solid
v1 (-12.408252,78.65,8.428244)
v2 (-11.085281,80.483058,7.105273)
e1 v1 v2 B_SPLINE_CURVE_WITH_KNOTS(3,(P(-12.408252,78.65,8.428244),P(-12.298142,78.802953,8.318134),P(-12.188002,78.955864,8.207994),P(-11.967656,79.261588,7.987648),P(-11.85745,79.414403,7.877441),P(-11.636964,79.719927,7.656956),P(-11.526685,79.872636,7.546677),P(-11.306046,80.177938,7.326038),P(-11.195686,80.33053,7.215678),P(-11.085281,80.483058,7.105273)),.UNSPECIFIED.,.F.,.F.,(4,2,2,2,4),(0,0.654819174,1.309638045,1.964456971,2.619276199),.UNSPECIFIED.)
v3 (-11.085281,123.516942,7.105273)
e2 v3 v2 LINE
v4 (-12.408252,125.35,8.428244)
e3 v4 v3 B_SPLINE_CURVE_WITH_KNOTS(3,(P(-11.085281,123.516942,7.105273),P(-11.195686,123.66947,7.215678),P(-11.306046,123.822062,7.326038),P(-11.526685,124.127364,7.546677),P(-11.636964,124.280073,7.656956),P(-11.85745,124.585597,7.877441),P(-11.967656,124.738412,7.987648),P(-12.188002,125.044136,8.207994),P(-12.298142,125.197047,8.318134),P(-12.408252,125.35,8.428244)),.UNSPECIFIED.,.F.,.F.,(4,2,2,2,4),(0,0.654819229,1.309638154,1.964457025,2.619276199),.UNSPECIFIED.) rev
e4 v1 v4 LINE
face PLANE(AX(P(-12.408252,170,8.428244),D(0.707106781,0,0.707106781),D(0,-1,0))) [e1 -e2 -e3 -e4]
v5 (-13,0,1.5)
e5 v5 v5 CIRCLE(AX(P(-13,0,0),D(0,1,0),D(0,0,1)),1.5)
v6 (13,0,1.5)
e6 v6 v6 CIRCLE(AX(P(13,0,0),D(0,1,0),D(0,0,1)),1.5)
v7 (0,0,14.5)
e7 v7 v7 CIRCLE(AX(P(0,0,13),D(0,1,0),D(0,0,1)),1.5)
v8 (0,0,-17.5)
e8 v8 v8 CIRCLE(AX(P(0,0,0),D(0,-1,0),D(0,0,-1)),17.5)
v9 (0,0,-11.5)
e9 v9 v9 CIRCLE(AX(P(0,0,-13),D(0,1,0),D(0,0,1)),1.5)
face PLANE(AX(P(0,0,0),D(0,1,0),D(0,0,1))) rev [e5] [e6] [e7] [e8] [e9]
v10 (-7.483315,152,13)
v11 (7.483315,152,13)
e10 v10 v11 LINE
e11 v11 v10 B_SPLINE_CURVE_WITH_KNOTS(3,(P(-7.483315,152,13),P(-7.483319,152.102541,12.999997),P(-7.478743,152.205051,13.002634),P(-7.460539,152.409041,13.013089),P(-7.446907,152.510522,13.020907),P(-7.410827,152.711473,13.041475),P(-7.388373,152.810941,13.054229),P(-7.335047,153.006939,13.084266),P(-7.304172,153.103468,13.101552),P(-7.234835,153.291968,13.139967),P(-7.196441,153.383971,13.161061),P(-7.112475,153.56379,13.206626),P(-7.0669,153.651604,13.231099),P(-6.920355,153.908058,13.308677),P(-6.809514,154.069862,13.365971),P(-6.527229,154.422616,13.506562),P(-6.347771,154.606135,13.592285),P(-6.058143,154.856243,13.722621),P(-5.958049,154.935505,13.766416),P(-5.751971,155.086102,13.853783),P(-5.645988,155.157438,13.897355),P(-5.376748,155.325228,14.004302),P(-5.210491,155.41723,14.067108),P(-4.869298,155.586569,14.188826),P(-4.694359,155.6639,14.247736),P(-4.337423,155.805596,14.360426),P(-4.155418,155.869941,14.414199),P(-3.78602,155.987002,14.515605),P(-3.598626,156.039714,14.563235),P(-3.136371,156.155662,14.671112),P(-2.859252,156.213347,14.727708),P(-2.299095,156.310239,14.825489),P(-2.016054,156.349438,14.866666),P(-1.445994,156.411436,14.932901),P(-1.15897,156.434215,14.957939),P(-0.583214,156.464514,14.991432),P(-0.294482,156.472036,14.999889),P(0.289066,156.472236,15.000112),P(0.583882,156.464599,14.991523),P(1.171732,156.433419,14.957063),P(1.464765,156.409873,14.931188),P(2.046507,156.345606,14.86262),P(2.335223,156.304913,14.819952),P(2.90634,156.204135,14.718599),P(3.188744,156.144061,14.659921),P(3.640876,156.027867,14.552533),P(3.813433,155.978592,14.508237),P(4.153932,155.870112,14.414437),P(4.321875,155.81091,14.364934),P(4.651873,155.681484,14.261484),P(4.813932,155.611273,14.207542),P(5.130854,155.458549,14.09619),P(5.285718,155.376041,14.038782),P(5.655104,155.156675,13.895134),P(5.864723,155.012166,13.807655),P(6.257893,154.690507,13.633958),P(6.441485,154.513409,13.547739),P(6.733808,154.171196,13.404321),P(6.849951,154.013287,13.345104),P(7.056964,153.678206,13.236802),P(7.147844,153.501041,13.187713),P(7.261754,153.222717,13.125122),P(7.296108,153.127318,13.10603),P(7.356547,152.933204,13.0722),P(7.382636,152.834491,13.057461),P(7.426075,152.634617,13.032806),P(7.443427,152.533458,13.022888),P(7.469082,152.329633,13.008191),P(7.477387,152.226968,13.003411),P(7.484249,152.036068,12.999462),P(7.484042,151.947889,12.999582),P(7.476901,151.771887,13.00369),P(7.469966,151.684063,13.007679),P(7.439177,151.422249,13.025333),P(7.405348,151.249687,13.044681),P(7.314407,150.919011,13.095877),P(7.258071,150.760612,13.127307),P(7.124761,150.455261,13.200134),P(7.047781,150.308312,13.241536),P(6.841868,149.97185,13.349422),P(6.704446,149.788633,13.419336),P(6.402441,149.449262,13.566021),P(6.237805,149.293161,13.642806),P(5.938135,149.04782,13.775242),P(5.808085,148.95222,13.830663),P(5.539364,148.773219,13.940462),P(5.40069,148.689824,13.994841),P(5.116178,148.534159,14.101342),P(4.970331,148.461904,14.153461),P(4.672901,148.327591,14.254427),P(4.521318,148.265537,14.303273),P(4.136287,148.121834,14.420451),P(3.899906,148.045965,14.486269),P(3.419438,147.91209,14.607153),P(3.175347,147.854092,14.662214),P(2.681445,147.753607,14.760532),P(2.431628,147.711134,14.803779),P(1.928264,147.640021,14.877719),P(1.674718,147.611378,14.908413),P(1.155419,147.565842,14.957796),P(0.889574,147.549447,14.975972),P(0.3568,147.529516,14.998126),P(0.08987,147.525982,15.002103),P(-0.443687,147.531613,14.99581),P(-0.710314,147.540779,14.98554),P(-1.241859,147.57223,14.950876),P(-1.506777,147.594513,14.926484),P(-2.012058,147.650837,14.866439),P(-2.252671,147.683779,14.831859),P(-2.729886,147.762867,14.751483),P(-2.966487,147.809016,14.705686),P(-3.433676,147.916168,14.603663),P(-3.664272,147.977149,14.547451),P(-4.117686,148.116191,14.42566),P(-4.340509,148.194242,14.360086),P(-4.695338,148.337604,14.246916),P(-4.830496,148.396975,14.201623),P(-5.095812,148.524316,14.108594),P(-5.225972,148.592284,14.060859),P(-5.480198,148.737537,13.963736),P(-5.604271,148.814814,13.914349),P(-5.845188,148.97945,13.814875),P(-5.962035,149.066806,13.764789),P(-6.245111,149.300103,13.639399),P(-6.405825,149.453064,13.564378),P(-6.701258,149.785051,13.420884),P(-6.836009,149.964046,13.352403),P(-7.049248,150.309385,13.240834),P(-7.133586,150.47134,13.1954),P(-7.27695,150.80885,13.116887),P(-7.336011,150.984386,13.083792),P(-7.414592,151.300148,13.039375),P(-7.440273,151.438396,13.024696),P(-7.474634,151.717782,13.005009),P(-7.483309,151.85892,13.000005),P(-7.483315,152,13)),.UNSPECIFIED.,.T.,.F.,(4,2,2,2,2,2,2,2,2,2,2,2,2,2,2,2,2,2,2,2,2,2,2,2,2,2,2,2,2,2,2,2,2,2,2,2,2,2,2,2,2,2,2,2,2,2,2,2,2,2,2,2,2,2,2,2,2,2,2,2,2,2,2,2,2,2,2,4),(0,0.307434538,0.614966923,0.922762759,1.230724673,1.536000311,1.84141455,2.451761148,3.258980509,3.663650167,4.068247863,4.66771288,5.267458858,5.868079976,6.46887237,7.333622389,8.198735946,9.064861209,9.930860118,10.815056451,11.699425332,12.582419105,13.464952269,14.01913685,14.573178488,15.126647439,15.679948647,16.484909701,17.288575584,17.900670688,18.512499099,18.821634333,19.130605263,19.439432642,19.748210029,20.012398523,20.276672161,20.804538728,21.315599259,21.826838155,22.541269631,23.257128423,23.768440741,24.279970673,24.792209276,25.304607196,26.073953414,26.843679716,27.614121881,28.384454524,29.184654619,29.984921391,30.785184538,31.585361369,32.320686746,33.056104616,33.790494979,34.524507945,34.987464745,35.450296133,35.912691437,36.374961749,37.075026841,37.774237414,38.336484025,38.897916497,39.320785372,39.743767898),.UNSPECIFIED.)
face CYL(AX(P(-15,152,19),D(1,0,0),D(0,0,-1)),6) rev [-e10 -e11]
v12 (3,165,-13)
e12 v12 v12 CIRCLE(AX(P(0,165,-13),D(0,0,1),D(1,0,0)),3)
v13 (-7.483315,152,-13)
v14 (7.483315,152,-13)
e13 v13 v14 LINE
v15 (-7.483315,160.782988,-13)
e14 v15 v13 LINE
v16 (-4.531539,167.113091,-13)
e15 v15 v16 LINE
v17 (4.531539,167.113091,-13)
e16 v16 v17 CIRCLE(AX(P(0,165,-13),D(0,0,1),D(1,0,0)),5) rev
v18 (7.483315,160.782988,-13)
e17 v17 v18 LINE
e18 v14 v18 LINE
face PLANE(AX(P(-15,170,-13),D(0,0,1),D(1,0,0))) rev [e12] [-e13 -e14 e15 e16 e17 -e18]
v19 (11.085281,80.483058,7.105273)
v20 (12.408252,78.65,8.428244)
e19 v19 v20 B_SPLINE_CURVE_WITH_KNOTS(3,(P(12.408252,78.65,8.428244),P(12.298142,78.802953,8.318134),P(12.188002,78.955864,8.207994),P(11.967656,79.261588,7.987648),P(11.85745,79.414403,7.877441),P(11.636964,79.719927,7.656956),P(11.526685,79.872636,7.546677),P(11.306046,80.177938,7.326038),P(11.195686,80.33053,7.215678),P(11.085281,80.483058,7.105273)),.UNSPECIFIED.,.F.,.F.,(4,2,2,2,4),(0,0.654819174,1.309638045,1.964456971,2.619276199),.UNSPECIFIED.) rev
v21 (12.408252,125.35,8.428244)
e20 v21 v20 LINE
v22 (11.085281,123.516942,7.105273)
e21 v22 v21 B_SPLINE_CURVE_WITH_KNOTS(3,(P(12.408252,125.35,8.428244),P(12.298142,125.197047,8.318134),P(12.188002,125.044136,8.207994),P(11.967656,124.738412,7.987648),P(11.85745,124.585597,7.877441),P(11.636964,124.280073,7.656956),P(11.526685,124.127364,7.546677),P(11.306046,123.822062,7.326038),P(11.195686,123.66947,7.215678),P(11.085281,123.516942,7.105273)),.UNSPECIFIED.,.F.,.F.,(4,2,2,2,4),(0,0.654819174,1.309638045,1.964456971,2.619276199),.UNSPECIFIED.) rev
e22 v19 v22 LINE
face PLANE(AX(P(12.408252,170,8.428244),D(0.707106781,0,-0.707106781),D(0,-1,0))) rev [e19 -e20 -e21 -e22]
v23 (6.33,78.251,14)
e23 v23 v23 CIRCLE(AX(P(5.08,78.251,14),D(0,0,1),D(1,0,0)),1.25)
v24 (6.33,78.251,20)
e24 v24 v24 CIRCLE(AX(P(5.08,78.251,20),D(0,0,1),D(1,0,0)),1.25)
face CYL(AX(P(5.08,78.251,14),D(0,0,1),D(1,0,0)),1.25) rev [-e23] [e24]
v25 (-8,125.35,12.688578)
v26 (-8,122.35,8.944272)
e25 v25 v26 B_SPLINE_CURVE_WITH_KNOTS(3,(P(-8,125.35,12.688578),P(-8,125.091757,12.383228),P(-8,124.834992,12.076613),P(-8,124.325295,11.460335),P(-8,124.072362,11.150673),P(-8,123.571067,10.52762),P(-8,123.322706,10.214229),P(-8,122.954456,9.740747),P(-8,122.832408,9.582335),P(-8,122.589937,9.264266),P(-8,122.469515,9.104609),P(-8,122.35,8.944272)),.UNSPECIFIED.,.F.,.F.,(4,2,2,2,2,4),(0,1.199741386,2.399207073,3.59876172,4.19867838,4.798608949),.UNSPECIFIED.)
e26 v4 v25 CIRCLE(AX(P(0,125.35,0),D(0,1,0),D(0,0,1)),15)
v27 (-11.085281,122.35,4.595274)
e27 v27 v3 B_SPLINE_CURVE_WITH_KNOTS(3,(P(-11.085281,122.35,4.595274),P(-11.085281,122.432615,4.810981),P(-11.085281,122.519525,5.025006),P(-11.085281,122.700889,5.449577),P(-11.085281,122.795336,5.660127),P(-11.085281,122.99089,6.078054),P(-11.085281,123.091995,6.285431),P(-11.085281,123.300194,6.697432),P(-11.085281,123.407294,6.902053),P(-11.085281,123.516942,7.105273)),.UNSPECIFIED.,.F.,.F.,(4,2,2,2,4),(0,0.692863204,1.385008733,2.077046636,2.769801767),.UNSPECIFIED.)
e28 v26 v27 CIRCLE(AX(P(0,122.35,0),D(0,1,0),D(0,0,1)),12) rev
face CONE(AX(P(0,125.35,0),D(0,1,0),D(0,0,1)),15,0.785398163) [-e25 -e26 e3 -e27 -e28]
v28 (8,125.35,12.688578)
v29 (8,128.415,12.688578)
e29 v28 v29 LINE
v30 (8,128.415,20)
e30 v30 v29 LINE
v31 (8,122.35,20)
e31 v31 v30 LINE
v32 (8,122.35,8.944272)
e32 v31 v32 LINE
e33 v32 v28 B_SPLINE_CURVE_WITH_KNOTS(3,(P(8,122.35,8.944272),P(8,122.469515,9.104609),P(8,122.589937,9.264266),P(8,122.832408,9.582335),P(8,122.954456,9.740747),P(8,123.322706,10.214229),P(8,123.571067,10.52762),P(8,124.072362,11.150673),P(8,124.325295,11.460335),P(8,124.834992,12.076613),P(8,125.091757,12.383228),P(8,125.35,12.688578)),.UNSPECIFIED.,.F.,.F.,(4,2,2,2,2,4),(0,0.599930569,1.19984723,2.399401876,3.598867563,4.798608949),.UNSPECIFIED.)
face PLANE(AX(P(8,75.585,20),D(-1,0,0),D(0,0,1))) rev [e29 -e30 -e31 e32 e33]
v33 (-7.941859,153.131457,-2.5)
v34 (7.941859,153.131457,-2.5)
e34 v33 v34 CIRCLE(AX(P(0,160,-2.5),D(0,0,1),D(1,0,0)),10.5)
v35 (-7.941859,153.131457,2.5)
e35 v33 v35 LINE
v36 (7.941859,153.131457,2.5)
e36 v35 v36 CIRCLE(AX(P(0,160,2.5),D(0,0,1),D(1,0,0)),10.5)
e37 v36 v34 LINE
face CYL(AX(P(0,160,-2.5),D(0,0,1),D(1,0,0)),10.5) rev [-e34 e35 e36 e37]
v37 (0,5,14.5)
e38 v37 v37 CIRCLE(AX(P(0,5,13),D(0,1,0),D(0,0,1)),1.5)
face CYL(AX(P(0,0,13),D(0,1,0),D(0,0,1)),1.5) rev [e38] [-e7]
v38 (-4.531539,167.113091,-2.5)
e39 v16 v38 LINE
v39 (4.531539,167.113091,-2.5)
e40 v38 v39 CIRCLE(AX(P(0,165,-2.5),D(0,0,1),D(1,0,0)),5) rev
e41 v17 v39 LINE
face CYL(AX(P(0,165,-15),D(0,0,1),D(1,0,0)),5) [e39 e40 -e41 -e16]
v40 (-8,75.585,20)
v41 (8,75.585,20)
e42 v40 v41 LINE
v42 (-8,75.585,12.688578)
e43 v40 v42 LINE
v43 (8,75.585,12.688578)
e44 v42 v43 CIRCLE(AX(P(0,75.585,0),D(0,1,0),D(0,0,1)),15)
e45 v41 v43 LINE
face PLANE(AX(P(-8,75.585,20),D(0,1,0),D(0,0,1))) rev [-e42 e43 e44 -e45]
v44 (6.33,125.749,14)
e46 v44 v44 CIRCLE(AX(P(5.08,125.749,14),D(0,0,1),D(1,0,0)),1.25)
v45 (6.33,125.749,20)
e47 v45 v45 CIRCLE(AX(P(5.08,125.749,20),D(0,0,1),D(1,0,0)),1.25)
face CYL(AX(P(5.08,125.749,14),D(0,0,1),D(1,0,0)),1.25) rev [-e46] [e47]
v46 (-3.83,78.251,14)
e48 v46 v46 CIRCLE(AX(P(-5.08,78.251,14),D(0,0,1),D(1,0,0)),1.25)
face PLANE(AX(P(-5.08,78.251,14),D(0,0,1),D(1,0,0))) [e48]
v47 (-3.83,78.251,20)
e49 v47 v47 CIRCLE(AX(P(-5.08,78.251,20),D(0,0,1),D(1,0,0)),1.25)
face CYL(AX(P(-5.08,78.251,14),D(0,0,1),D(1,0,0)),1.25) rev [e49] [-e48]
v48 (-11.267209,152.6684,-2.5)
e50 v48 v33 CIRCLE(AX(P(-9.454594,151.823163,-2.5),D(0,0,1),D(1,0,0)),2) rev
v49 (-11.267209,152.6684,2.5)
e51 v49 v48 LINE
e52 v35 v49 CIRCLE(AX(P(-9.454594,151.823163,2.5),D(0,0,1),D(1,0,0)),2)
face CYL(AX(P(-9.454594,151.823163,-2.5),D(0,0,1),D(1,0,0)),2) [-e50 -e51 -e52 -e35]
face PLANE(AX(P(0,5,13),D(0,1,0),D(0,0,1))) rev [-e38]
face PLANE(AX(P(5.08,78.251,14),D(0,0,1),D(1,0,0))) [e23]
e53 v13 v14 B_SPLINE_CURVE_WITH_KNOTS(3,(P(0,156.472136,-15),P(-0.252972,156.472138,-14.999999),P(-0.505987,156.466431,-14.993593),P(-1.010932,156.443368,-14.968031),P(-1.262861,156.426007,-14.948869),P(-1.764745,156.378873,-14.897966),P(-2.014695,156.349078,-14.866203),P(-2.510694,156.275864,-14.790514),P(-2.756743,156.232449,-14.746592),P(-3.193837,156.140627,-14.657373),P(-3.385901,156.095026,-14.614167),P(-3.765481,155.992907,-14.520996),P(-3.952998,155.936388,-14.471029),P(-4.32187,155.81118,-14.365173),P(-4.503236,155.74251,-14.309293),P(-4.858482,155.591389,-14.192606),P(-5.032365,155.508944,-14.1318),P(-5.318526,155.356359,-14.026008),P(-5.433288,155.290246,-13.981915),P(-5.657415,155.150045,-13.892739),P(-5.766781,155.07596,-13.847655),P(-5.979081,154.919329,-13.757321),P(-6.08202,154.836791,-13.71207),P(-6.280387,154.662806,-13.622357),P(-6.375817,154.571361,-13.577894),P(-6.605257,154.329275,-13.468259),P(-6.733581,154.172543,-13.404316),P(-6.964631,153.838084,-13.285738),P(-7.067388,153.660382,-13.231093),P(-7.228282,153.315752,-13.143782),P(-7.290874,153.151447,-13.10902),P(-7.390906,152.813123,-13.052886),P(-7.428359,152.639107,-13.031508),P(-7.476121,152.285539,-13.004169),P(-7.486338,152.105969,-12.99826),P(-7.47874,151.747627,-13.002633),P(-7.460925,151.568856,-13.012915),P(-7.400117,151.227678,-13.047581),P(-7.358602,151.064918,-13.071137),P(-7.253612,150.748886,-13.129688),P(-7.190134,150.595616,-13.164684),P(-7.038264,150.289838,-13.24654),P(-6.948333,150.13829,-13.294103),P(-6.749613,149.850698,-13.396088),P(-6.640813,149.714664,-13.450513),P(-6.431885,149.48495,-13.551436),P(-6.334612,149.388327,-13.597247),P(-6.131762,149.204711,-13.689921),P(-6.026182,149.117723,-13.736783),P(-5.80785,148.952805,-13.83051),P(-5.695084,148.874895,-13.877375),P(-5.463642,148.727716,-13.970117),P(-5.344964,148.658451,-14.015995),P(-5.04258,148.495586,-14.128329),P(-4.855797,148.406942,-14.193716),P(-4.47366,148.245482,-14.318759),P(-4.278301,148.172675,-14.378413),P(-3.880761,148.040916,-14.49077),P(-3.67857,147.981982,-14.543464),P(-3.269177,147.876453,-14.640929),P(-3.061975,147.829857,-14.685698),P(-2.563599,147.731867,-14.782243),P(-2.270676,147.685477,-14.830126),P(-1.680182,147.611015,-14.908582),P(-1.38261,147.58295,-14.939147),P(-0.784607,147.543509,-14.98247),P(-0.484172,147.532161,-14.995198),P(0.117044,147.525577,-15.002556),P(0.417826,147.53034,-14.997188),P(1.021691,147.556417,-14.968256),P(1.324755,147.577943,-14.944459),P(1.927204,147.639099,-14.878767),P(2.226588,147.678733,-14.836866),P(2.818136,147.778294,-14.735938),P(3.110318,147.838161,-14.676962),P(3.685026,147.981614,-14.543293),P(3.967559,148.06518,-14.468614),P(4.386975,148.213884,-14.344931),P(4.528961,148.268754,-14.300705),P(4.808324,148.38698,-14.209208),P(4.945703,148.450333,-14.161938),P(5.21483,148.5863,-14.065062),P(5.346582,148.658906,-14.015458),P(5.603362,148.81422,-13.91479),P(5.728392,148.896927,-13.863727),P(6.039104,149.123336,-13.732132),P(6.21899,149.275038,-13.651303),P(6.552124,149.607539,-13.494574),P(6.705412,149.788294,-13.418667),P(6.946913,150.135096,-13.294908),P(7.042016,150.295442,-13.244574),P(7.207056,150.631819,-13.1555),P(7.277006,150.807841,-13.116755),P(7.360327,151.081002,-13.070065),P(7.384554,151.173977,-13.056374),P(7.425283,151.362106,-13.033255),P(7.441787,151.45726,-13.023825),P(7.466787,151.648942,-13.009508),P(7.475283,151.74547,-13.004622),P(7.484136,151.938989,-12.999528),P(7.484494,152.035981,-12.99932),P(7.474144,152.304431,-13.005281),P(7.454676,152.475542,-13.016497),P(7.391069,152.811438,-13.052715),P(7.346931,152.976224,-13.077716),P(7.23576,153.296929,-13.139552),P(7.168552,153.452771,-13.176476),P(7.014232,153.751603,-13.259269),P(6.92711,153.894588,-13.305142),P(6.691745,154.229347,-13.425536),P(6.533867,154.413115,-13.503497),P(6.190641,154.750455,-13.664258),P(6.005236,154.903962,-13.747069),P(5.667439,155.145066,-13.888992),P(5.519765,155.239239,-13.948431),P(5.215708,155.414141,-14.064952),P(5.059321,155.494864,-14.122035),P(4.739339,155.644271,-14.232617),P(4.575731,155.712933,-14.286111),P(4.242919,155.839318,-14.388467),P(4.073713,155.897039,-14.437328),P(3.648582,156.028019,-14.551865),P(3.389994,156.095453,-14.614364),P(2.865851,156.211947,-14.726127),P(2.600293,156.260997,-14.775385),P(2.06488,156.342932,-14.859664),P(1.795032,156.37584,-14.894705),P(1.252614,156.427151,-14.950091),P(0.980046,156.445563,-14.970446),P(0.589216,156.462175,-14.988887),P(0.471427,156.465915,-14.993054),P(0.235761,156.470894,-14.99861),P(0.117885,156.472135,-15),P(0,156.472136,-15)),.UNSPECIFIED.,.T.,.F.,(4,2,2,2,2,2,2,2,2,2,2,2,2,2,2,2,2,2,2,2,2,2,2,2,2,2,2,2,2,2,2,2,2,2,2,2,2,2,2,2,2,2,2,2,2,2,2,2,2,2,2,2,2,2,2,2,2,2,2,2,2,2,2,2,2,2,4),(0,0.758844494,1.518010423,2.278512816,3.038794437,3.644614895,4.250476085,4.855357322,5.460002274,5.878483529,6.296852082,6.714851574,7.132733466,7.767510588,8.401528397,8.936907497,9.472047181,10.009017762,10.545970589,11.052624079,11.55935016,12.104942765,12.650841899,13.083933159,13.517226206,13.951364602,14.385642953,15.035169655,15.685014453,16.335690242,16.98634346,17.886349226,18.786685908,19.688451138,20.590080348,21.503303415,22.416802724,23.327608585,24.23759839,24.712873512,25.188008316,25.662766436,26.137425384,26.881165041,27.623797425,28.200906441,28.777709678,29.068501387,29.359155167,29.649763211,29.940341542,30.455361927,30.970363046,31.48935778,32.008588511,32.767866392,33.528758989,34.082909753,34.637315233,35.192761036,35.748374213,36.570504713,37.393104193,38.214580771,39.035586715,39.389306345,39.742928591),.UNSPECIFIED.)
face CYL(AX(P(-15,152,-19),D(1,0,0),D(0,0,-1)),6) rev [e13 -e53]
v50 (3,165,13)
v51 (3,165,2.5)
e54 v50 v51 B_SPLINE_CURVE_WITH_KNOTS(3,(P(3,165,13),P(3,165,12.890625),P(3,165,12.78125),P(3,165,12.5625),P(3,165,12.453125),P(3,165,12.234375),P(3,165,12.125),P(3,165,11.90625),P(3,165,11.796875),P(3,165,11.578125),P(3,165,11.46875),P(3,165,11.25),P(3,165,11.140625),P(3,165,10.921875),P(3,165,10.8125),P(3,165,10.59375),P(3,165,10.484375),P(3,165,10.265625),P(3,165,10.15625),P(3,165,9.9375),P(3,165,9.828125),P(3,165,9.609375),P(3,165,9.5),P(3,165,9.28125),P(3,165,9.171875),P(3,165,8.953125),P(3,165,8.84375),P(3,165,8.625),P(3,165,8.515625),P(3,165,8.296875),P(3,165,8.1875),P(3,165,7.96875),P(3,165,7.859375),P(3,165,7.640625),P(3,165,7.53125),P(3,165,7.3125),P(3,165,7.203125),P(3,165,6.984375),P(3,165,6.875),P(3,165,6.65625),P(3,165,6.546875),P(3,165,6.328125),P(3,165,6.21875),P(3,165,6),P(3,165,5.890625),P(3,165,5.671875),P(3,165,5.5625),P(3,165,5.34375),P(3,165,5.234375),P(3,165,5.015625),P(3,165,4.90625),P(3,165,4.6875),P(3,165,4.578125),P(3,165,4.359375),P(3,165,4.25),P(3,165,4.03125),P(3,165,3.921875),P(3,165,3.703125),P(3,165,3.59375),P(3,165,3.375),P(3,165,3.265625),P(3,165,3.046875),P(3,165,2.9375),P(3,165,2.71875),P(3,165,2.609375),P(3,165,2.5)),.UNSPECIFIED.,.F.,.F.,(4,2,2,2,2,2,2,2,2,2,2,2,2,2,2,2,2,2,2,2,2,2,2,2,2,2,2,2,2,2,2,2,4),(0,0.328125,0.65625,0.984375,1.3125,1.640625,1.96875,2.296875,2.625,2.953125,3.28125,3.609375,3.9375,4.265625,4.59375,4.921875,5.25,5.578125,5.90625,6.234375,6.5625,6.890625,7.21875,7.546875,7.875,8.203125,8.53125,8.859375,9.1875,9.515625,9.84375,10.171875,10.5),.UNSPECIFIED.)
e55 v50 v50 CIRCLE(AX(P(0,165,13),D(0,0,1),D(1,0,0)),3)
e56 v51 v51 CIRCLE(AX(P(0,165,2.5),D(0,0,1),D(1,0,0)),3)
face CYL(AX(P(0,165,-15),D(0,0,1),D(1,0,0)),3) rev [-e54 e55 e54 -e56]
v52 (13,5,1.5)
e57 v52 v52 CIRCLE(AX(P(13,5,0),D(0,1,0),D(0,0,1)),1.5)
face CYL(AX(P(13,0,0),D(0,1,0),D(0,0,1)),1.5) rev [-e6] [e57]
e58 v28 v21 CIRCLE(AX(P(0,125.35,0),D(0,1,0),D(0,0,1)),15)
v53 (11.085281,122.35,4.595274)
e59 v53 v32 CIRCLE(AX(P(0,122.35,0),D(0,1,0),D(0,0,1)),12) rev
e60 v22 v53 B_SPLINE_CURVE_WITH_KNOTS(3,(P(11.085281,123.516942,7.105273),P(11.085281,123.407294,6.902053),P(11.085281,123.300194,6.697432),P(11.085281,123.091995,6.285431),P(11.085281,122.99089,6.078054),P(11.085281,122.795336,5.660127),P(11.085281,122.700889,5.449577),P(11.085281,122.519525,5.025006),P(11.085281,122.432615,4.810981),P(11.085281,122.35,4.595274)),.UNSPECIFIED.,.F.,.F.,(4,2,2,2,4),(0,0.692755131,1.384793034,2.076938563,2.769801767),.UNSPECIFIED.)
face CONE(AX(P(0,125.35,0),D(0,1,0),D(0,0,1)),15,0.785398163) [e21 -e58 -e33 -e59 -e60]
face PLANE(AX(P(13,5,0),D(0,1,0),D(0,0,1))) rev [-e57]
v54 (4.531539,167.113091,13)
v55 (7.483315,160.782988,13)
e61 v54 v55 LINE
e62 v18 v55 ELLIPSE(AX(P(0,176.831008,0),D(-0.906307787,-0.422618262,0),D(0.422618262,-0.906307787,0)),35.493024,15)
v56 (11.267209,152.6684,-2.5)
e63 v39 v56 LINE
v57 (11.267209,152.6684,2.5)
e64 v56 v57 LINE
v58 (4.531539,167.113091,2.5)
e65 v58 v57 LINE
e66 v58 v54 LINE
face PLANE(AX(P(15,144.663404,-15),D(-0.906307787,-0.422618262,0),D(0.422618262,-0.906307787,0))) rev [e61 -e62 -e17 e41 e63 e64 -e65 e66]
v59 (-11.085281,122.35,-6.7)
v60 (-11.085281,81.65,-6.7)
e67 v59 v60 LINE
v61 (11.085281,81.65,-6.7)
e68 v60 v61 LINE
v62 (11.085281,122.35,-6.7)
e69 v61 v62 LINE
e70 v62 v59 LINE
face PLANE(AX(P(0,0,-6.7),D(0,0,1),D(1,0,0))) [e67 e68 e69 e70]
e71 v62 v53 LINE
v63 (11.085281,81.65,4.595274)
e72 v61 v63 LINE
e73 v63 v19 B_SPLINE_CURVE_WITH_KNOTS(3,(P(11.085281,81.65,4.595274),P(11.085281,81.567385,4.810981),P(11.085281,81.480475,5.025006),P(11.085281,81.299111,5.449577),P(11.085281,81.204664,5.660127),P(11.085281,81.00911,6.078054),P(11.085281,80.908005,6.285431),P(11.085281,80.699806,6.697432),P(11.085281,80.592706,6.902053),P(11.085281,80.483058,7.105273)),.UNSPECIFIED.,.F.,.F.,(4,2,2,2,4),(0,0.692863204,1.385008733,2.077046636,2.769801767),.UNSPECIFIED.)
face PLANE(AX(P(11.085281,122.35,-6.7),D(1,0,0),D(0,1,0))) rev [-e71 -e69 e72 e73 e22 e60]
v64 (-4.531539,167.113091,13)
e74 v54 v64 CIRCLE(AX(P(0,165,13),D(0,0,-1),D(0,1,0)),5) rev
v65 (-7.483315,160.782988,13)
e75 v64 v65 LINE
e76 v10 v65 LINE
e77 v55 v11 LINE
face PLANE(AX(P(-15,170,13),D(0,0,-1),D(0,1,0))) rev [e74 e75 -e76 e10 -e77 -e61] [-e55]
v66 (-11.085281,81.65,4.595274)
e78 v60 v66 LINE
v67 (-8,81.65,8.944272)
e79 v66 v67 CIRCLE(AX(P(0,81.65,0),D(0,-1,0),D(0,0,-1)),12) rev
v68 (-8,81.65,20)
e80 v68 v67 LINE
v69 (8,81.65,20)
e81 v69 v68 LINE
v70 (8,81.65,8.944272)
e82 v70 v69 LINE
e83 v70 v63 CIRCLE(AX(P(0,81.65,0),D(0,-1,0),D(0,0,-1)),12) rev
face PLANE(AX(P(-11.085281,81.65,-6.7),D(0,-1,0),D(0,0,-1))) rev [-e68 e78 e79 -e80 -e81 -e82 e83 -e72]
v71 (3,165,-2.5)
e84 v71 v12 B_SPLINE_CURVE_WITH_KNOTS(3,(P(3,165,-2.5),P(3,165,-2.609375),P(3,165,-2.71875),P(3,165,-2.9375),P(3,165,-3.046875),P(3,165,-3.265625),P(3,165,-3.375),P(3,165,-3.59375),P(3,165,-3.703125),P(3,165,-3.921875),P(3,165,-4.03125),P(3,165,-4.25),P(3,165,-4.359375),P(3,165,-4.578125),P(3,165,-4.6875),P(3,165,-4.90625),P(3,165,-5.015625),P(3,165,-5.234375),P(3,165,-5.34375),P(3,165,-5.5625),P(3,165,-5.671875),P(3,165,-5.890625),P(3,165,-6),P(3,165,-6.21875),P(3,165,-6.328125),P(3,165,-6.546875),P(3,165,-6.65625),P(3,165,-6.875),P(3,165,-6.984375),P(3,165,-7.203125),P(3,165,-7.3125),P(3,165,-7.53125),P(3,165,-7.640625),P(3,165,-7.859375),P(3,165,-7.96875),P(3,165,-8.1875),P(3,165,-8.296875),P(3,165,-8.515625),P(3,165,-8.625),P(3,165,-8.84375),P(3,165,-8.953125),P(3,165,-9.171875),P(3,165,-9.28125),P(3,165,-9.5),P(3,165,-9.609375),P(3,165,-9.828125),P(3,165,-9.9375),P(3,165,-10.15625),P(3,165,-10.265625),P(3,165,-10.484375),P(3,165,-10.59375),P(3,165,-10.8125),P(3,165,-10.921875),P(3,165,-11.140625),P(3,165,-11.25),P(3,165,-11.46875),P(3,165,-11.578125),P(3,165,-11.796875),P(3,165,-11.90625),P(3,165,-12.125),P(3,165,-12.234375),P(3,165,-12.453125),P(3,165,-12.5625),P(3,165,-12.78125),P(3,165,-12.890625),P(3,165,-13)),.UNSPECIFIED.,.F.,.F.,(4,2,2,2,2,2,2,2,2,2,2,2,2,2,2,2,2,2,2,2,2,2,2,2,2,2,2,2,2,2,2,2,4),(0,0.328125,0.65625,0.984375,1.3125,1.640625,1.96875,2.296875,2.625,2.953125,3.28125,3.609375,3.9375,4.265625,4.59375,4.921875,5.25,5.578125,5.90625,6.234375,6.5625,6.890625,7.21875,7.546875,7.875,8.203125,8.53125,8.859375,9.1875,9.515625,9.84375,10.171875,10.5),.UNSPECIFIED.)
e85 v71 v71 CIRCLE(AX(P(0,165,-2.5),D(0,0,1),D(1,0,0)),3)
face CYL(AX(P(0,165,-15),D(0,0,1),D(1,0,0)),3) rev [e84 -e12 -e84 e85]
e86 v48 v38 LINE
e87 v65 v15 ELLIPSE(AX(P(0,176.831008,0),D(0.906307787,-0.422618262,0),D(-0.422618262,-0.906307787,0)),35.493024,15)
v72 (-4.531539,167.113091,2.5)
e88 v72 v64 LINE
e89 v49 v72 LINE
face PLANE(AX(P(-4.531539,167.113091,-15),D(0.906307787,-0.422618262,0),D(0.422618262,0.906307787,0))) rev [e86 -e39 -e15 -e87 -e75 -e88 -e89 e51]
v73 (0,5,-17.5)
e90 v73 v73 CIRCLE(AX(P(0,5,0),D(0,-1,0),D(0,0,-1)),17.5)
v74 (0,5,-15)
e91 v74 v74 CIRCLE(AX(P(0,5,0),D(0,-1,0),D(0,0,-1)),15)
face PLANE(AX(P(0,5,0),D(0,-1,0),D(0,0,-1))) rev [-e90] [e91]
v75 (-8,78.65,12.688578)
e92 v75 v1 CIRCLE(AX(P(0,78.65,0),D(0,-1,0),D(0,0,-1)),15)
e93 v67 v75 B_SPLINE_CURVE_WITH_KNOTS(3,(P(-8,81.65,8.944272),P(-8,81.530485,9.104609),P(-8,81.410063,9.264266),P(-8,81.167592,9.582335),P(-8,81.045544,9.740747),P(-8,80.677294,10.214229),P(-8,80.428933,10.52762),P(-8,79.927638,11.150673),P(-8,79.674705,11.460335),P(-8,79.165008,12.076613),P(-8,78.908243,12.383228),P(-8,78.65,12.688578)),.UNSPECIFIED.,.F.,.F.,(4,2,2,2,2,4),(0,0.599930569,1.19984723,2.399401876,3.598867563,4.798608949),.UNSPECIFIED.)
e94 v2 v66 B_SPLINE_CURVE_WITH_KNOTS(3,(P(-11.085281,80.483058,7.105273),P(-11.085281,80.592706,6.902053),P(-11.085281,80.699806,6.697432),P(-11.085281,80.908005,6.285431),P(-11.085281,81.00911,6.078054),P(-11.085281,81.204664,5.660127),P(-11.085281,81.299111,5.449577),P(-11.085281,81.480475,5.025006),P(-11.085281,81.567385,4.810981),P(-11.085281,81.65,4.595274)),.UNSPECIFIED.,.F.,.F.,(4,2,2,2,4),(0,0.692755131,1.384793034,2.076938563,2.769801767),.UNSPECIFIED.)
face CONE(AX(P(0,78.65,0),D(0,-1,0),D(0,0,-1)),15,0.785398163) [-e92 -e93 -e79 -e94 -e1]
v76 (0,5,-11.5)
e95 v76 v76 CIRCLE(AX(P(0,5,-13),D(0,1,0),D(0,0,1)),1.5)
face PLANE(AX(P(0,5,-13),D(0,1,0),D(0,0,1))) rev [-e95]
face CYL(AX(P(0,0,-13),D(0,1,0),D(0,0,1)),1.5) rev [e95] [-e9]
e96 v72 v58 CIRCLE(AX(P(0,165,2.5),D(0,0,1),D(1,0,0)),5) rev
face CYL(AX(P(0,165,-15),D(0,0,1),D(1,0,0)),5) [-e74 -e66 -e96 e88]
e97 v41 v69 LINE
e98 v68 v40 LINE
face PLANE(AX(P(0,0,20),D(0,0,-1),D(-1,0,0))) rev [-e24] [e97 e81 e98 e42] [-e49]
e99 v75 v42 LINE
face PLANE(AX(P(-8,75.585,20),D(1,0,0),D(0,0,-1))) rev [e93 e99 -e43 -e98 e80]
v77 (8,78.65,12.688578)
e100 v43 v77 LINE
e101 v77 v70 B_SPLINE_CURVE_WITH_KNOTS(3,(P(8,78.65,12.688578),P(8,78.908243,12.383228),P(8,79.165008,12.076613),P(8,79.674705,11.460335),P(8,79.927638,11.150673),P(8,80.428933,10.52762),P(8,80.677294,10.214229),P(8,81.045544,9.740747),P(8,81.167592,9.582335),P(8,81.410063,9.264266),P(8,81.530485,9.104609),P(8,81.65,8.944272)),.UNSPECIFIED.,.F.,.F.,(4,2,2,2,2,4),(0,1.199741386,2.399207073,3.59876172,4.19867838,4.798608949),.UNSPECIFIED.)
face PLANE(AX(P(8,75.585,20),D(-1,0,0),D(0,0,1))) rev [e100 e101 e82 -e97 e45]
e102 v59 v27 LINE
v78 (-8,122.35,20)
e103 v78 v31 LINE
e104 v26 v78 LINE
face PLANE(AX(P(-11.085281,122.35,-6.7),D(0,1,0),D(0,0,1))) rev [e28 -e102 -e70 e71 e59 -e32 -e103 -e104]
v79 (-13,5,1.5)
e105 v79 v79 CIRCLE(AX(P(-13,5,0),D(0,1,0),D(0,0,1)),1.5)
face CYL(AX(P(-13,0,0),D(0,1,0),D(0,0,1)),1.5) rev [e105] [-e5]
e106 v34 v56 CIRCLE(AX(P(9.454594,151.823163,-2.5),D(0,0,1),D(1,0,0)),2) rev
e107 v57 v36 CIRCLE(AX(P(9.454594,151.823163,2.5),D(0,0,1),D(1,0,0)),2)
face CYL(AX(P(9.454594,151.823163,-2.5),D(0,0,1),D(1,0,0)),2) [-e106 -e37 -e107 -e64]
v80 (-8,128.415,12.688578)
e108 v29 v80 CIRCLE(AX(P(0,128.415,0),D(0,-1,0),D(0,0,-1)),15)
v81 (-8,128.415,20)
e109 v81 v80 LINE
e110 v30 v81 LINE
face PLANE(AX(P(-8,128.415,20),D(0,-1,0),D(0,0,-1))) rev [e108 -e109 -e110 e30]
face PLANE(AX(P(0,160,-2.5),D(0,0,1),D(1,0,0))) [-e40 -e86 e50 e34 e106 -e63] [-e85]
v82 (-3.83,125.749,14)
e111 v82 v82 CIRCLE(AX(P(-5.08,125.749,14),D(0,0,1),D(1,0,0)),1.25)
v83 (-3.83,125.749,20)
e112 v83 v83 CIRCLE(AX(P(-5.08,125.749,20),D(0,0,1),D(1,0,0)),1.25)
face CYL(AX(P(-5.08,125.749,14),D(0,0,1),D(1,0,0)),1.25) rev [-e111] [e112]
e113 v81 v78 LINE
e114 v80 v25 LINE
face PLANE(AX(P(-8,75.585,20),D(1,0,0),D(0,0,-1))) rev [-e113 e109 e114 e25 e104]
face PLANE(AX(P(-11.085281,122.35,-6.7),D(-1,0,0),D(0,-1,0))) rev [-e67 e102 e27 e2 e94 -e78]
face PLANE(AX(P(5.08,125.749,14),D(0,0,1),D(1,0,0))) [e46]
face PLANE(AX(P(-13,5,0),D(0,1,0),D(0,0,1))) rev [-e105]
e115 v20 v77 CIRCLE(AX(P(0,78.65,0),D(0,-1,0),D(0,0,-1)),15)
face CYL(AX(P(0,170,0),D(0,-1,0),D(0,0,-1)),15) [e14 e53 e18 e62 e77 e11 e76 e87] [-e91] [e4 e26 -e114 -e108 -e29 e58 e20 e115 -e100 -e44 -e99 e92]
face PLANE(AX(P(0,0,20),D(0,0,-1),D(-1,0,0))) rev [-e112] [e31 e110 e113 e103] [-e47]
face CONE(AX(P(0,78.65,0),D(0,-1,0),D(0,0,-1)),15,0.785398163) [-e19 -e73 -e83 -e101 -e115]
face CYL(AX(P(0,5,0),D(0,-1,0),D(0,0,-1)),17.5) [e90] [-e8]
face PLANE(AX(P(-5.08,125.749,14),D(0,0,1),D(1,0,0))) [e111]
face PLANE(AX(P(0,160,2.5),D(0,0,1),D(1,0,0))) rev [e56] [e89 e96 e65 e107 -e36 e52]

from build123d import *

# Parameters (mm, degrees)
SKETCH1_R               = 15
BOSS_EXTRUDE1_DEPTH     = 170
CUT_EXTRUDE1_DEPTH      = 2.5
CUT_EXTRUDE2_DEPTH      = 172.31841699
CUT_EXTRUDE2_DEPTH_BACK = 172.31841699
SKETCH4_R               = 3
CUT_EXTRUDE3_DEPTH      = 173.942186995
CUT_EXTRUDE4_DEPTH      = 173.942186995
FILLET1_R               = 2
SKETCH6_W               = 16
SKETCH6_H               = 52.83
BOSS_EXTRUDE2_DEPTH     = 20
SKETCH7_W               = 22.170562286
SKETCH7_H               = 40.7
CUT_EXTRUDE5_DEPTH      = 26.7
SKETCH8_R               = 1.25
CUT_EXTRUDE6_DEPTH      = 6
SKETCH9_R               = 17.5
BOSS_EXTRUDE3_DEPTH     = 5
SKETCH10_R              = 1.5
CUT_EXTRUDE7_DEPTH      = 168.126449134
CHAMFER1_SIZE           = 3


with BuildPart() as part:
    # Sketch1 → Boss-Extrude1 (new body)
    with BuildSketch(Plane(origin=(0, 0, 0), x_dir=(1, 0, 0), z_dir=(0, 1, 0))):
        with Locations(Location((0, 0, 0), (0, 0, 270))):
            Circle(SKETCH1_R)
    extrude(amount=BOSS_EXTRUDE1_DEPTH)

    # Sketch2 → Cut-Extrude1 (cut, symmetric)
    with BuildSketch(Plane.XY):
        with BuildLine():
            Line((-10.5, 160), (-10.5, 182.220649026))
            Line((-10.5, 182.220649026), (10.5, 182.220649026))
            Line((10.5, 182.220649026), (10.5, 160))
            ThreePointArc((10.5, 160), (0, 149.5), (-10.5, 160))
        make_face()
    extrude(amount=CUT_EXTRUDE1_DEPTH, both=True, mode=Mode.SUBTRACT)

    # Sketch3 → Cut-Extrude2 (cut, two sides: drawn at the far end of the back side and taken through both)
    with BuildSketch(Plane(origin=(0, 0, 0), x_dir=(0, 0, -1), z_dir=(1, 0, 0)).offset(-CUT_EXTRUDE2_DEPTH_BACK)):
        with BuildLine():
            Line((-15, 170), (-13, 170))
            Line((-13, 170), (-13, 152))
            ThreePointArc((-13, 152), (-13.522774425, 149.550510257), (-15, 147.527864045))
            Line((-15, 147.527864045), (-15, 170))
        make_face()
        with BuildLine():
            Line((15, 170), (15, 147.527864045))
            ThreePointArc((15, 147.527864045), (13.522774425, 149.550510257), (13, 152))
            Line((13, 152), (13, 170))
            Line((13, 170), (15, 170))
        make_face()
    extrude(amount=CUT_EXTRUDE2_DEPTH + CUT_EXTRUDE2_DEPTH_BACK, mode=Mode.SUBTRACT)

    # Sketch4 → Cut-Extrude3 (cut, through all)
    with BuildSketch(Plane.XY.offset(13)):
        with Locations((0, 165)):
            Circle(SKETCH4_R)
    extrude(amount=-CUT_EXTRUDE3_DEPTH, mode=Mode.SUBTRACT)

    # Sketch5 → Cut-Extrude4 (cut, through all)
    with BuildSketch(Plane.XY.offset(13)):
        with BuildLine():
            Line((-4.531538935, 167.113091309), (-15, 144.663404108))
            Line((-15, 144.663404108), (-15, 175.276470842))
            Line((-15, 175.276470842), (15, 175.276470842))
            Line((15, 175.276470842), (15, 144.663404108))
            Line((15, 144.663404108), (4.531538935, 167.113091309))
            ThreePointArc((4.531538935, 167.113091309), (0, 170), (-4.531538935, 167.113091309))
        make_face()
    extrude(amount=-CUT_EXTRUDE4_DEPTH, mode=Mode.SUBTRACT)

    # Fillet1
    fillet1_edges = [part.edges().sort_by_distance(p)[0] for p in [
        (-9.710782673, 156.00616727, 0),
        (9.710782673, 156.00616727, 0),
    ]]
    fillet(fillet1_edges, radius=FILLET1_R)

    # Sketch6 → Boss-Extrude2 (add)
    with BuildSketch(Plane.XY):
        with Locations((0, 102)):
            Rectangle(SKETCH6_W, SKETCH6_H)
    extrude(amount=BOSS_EXTRUDE2_DEPTH)

    # Sketch7 → Cut-Extrude5 (cut)
    with BuildSketch(Plane.XY.offset(20)):
        with Locations((0, 102)):
            Rectangle(SKETCH7_W, SKETCH7_H)
    extrude(amount=-CUT_EXTRUDE5_DEPTH, mode=Mode.SUBTRACT)

    # Sketch8 → Cut-Extrude6 (cut)
    with BuildSketch(Plane.XY.offset(20)):
        with Locations((-5.08, 125.749)):
            Circle(SKETCH8_R)
        with Locations((-5.08, 78.251)):
            Circle(SKETCH8_R)
        with Locations((5.08, 125.749)):
            Circle(SKETCH8_R)
        with Locations((5.08, 78.251)):
            Circle(SKETCH8_R)
    extrude(amount=-CUT_EXTRUDE6_DEPTH, mode=Mode.SUBTRACT)

    # Sketch9 → Boss-Extrude3 (add)
    with BuildSketch(Plane.XZ):
        with Locations(Location((0, 0, 0), (0, 0, 270))):
            Circle(SKETCH9_R)
    extrude(amount=-BOSS_EXTRUDE3_DEPTH)

    # Sketch10 → Cut-Extrude7 (cut, through all)
    with BuildSketch(Plane(origin=(0, 5, 0), x_dir=(1, 0, 0), z_dir=(0, 1, 0))):
        with Locations(Location((0, 13, 0), (0, 0, 270))):
            Circle(SKETCH10_R)
        with Locations(Location((13, 0, 0), (0, 0, 270))):
            Circle(SKETCH10_R)
        with Locations(Location((0, -13, 0), (0, 0, 270))):
            Circle(SKETCH10_R)
        with Locations(Location((-13, 0, 0), (0, 0, 270))):
            Circle(SKETCH10_R)
    extrude(amount=-CUT_EXTRUDE7_DEPTH, mode=Mode.SUBTRACT)

    # Chamfer1
    # the kernel refuses this chamfer: 3, 2.123587696 mm, written as the material it takes off along each edge
    with BuildSketch(Plane(origin=(11.085281143, 122.35, 10.105272978), x_dir=(0.6193558356899025, 0, -0.785110405482479), z_dir=(0, -1, 0))) as chamfer1_piece_1:
        with BuildLine():
            Line((2.136042798, 0), (CHAMFER1_SIZE * 0.785110405482, -CHAMFER1_SIZE * 0.61935583569))
            Line((CHAMFER1_SIZE * 0.785110405482, -CHAMFER1_SIZE * 0.61935583569), (0, 0))
            ThreePointArc((0, 0), (1.060999102, 0.038068992), (2.136042798, 0))
        make_face()
    extrude(amount=40.7, mode=Mode.SUBTRACT)
    with BuildSketch(Plane(origin=(-11.085281143, 122.35, 10.105272978), x_dir=(-0.6193558356899055, 0, -0.7851104054824767), z_dir=(0, -1, 0))) as chamfer1_piece_2:
        with BuildLine():
            Line((2.136042798, 0), (CHAMFER1_SIZE * 0.785110405482, CHAMFER1_SIZE * 0.61935583569))
            Line((CHAMFER1_SIZE * 0.785110405482, CHAMFER1_SIZE * 0.61935583569), (0, 0))
            ThreePointArc((0, 0), (1.060999102, -0.038068992), (2.136042798, 0))
        make_face()
    extrude(amount=40.7, mode=Mode.SUBTRACT)
    with BuildSketch(Plane(origin=(0, 81.65, 0), x_dir=(0.9748295624413148, 0, 0.22295139423308089), z_dir=(0.22295139423308089, 0, -0.9748295624413148))) as chamfer1_piece_3_section:
        Polygon((15, CHAMFER1_SIZE), (15 - CHAMFER1_SIZE, 0), (15, 0), align=None)
    chamfer1_piece_3 = revolve(axis=Axis((0, 81.65, 0), (0, -1, 0)), revolution_arc=74.356268972, mode=Mode.PRIVATE)
    chamfer1_piece_3 = split(chamfer1_piece_3, bisect_by=Plane(origin=(8, 81.65, 0), z_dir=(1, 0, 0)), keep=Keep.TOP, mode=Mode.PRIVATE)
    chamfer1_piece_3 = split(chamfer1_piece_3, bisect_by=Plane(origin=(11.085281143, 81.65, 0), z_dir=(-1, 0, 0)), keep=Keep.TOP, mode=Mode.PRIVATE)
    add(chamfer1_piece_3, mode=Mode.SUBTRACT)
    with BuildSketch(Plane(origin=(0, 81.65, 0), x_dir=(-0.04817493211174053, 0, 0.9988389138975459), z_dir=(0.9988389138975459, 0, 0.04817493211174053))) as chamfer1_piece_4_section:
        Polygon((15, CHAMFER1_SIZE), (15 - CHAMFER1_SIZE, 0), (15, 0), align=None)
    chamfer1_piece_4 = revolve(axis=Axis((0, 81.65, 0), (0, -1, 0)), revolution_arc=74.356268972, mode=Mode.PRIVATE)
    chamfer1_piece_4 = split(chamfer1_piece_4, bisect_by=Plane(origin=(-8, 81.65, 0), z_dir=(-1, 0, 0)), keep=Keep.TOP, mode=Mode.PRIVATE)
    chamfer1_piece_4 = split(chamfer1_piece_4, bisect_by=Plane(origin=(-11.085281143, 81.65, 0), z_dir=(1, 0, 0)), keep=Keep.TOP, mode=Mode.PRIVATE)
    add(chamfer1_piece_4, mode=Mode.SUBTRACT)
    with BuildSketch(Plane(origin=(0, 122.35, 0), x_dir=(0.9748295624413144, 0, 0.22295139423308263), z_dir=(0.22295139423308263, 0, -0.9748295624413144))) as chamfer1_piece_5_section:
        Polygon((15, -CHAMFER1_SIZE), (15 - CHAMFER1_SIZE, 0), (15, 0), align=None)
    chamfer1_piece_5 = revolve(axis=Axis((0, 122.35, 0), (0, -1, 0)), revolution_arc=74.356268972, mode=Mode.PRIVATE)
    chamfer1_piece_5 = split(chamfer1_piece_5, bisect_by=Plane(origin=(8, 122.35, 0), z_dir=(1, 0, 0)), keep=Keep.TOP, mode=Mode.PRIVATE)
    chamfer1_piece_5 = split(chamfer1_piece_5, bisect_by=Plane(origin=(11.085281143, 122.35, 0), z_dir=(-1, 0, 0)), keep=Keep.TOP, mode=Mode.PRIVATE)
    add(chamfer1_piece_5, mode=Mode.SUBTRACT)
    with BuildSketch(Plane(origin=(0, 122.35, 0), x_dir=(-0.04817493211174064, 0, 0.9988389138975459), z_dir=(0.9988389138975459, 0, 0.04817493211174064))) as chamfer1_piece_6_section:
        Polygon((15, -CHAMFER1_SIZE), (15 - CHAMFER1_SIZE, 0), (15, 0), align=None)
    chamfer1_piece_6 = revolve(axis=Axis((0, 122.35, 0), (0, -1, 0)), revolution_arc=74.356268972, mode=Mode.PRIVATE)
    chamfer1_piece_6 = split(chamfer1_piece_6, bisect_by=Plane(origin=(-8, 122.35, 0), z_dir=(-1, 0, 0)), keep=Keep.TOP, mode=Mode.PRIVATE)
    chamfer1_piece_6 = split(chamfer1_piece_6, bisect_by=Plane(origin=(-11.085281143, 122.35, 0), z_dir=(1, 0, 0)), keep=Keep.TOP, mode=Mode.PRIVATE)
    add(chamfer1_piece_6, mode=Mode.SUBTRACT)
    with BuildSketch(Plane(origin=(0, 122.35, 0), x_dir=(0.9748295624413144, 0, 0.22295139423308263), z_dir=(0.22295139423308263, 0, -0.9748295624413144))) as chamfer1_piece_7a_section:
        Polygon((15, -CHAMFER1_SIZE), (15 - CHAMFER1_SIZE, 0), (15, 0), align=None)
    chamfer1_piece_7a = revolve(axis=Axis((0, 122.35, 0), (0, -1, 0)), revolution_arc=74.356268972, mode=Mode.PRIVATE)
    chamfer1_piece_7a = split(chamfer1_piece_7a, bisect_by=Plane(origin=(11.085281143, 122.35, 0), z_dir=(1, 0, 0)), keep=Keep.TOP, mode=Mode.PRIVATE)
    with BuildSketch(Plane(origin=(11.085281143, 130.065048964, 10.105272978), x_dir=(0.6193558356899025, 0, -0.785110405482479), z_dir=(0, -1, 0))) as chamfer1_piece_7b_section:
        with BuildLine():
            Line((2.136042798, 0), (CHAMFER1_SIZE * 0.785110405482, -CHAMFER1_SIZE * 0.61935583569))
            Line((CHAMFER1_SIZE * 0.785110405482, -CHAMFER1_SIZE * 0.61935583569), (0, 0))
            ThreePointArc((0, 0), (1.060999102, 0.038068992), (2.136042798, 0))
        make_face()
    chamfer1_piece_7b = extrude(amount=48.415048964, mode=Mode.PRIVATE)
    chamfer1_piece_7b = split(chamfer1_piece_7b, bisect_by=Plane(origin=(11.085281143, 122.35, 10.105272978), z_dir=(0, 1, 0)), keep=Keep.TOP, mode=Mode.PRIVATE)
    chamfer1_piece_7 = chamfer1_piece_7a & chamfer1_piece_7b
    add(chamfer1_piece_7, mode=Mode.SUBTRACT)
    with BuildSketch(Plane(origin=(11.085281143, 122.35, 10.105272978), x_dir=(0.6193558356899025, 0, -0.785110405482479), z_dir=(0, -1, 0))) as chamfer1_piece_8a_section:
        with BuildLine():
            Line((2.136042798, 0), (CHAMFER1_SIZE * 0.785110405482, -CHAMFER1_SIZE * 0.61935583569))
            Line((CHAMFER1_SIZE * 0.785110405482, -CHAMFER1_SIZE * 0.61935583569), (0, 0))
            ThreePointArc((0, 0), (1.060999102, 0.038068992), (2.136042798, 0))
        make_face()
    chamfer1_piece_8a = extrude(amount=48.415048964, mode=Mode.PRIVATE)
    chamfer1_piece_8a = split(chamfer1_piece_8a, bisect_by=Plane(origin=(11.085281143, 81.65, 10.105272978), z_dir=(0, -1, 0)), keep=Keep.TOP, mode=Mode.PRIVATE)
    with BuildSketch(Plane(origin=(0, 81.65, 0), x_dir=(0.9748295624413148, 0, 0.22295139423308089), z_dir=(0.22295139423308089, 0, -0.9748295624413148))) as chamfer1_piece_8b_section:
        Polygon((15, CHAMFER1_SIZE), (15 - CHAMFER1_SIZE, 0), (15, 0), align=None)
    chamfer1_piece_8b = revolve(axis=Axis((0, 81.65, 0), (0, -1, 0)), revolution_arc=74.356268972, mode=Mode.PRIVATE)
    chamfer1_piece_8b = split(chamfer1_piece_8b, bisect_by=Plane(origin=(11.085281143, 81.65, 0), z_dir=(1, 0, 0)), keep=Keep.TOP, mode=Mode.PRIVATE)
    chamfer1_piece_8 = chamfer1_piece_8a & chamfer1_piece_8b
    add(chamfer1_piece_8, mode=Mode.SUBTRACT)
    with BuildSketch(Plane(origin=(-11.085281143, 130.065048964, 10.105272978), x_dir=(-0.6193558356899055, 0, -0.7851104054824767), z_dir=(0, -1, 0))) as chamfer1_piece_9a_section:
        with BuildLine():
            Line((2.136042798, 0), (CHAMFER1_SIZE * 0.785110405482, CHAMFER1_SIZE * 0.61935583569))
            Line((CHAMFER1_SIZE * 0.785110405482, CHAMFER1_SIZE * 0.61935583569), (0, 0))
            ThreePointArc((0, 0), (1.060999102, -0.038068992), (2.136042798, 0))
        make_face()
    chamfer1_piece_9a = extrude(amount=48.415048964, mode=Mode.PRIVATE)
    chamfer1_piece_9a = split(chamfer1_piece_9a, bisect_by=Plane(origin=(-11.085281143, 122.35, 10.105272978), z_dir=(0, 1, 0)), keep=Keep.TOP, mode=Mode.PRIVATE)
    with BuildSketch(Plane(origin=(0, 122.35, 0), x_dir=(-0.04817493211174064, 0, 0.9988389138975459), z_dir=(0.9988389138975459, 0, 0.04817493211174064))) as chamfer1_piece_9b_section:
        Polygon((15, -CHAMFER1_SIZE), (15 - CHAMFER1_SIZE, 0), (15, 0), align=None)
    chamfer1_piece_9b = revolve(axis=Axis((0, 122.35, 0), (0, -1, 0)), revolution_arc=74.356268972, mode=Mode.PRIVATE)
    chamfer1_piece_9b = split(chamfer1_piece_9b, bisect_by=Plane(origin=(-11.085281143, 122.35, 0), z_dir=(-1, 0, 0)), keep=Keep.TOP, mode=Mode.PRIVATE)
    chamfer1_piece_9 = chamfer1_piece_9a & chamfer1_piece_9b
    add(chamfer1_piece_9, mode=Mode.SUBTRACT)
    with BuildSketch(Plane(origin=(0, 81.65, 0), x_dir=(-0.04817493211174053, 0, 0.9988389138975459), z_dir=(0.9988389138975459, 0, 0.04817493211174053))) as chamfer1_piece_10a_section:
        Polygon((15, CHAMFER1_SIZE), (15 - CHAMFER1_SIZE, 0), (15, 0), align=None)
    chamfer1_piece_10a = revolve(axis=Axis((0, 81.65, 0), (0, -1, 0)), revolution_arc=74.356268972, mode=Mode.PRIVATE)
    chamfer1_piece_10a = split(chamfer1_piece_10a, bisect_by=Plane(origin=(-11.085281143, 81.65, 0), z_dir=(-1, 0, 0)), keep=Keep.TOP, mode=Mode.PRIVATE)
    with BuildSketch(Plane(origin=(-11.085281143, 122.35, 10.105272978), x_dir=(-0.6193558356899055, 0, -0.7851104054824767), z_dir=(0, -1, 0))) as chamfer1_piece_10b_section:
        with BuildLine():
            Line((2.136042798, 0), (CHAMFER1_SIZE * 0.785110405482, CHAMFER1_SIZE * 0.61935583569))
            Line((CHAMFER1_SIZE * 0.785110405482, CHAMFER1_SIZE * 0.61935583569), (0, 0))
            ThreePointArc((0, 0), (1.060999102, -0.038068992), (2.136042798, 0))
        make_face()
    chamfer1_piece_10b = extrude(amount=48.415048964, mode=Mode.PRIVATE)
    chamfer1_piece_10b = split(chamfer1_piece_10b, bisect_by=Plane(origin=(-11.085281143, 81.65, 10.105272978), z_dir=(0, -1, 0)), keep=Keep.TOP, mode=Mode.PRIVATE)
    chamfer1_piece_10 = chamfer1_piece_10a & chamfer1_piece_10b
    add(chamfer1_piece_10, mode=Mode.SUBTRACT)


solid = part.part
